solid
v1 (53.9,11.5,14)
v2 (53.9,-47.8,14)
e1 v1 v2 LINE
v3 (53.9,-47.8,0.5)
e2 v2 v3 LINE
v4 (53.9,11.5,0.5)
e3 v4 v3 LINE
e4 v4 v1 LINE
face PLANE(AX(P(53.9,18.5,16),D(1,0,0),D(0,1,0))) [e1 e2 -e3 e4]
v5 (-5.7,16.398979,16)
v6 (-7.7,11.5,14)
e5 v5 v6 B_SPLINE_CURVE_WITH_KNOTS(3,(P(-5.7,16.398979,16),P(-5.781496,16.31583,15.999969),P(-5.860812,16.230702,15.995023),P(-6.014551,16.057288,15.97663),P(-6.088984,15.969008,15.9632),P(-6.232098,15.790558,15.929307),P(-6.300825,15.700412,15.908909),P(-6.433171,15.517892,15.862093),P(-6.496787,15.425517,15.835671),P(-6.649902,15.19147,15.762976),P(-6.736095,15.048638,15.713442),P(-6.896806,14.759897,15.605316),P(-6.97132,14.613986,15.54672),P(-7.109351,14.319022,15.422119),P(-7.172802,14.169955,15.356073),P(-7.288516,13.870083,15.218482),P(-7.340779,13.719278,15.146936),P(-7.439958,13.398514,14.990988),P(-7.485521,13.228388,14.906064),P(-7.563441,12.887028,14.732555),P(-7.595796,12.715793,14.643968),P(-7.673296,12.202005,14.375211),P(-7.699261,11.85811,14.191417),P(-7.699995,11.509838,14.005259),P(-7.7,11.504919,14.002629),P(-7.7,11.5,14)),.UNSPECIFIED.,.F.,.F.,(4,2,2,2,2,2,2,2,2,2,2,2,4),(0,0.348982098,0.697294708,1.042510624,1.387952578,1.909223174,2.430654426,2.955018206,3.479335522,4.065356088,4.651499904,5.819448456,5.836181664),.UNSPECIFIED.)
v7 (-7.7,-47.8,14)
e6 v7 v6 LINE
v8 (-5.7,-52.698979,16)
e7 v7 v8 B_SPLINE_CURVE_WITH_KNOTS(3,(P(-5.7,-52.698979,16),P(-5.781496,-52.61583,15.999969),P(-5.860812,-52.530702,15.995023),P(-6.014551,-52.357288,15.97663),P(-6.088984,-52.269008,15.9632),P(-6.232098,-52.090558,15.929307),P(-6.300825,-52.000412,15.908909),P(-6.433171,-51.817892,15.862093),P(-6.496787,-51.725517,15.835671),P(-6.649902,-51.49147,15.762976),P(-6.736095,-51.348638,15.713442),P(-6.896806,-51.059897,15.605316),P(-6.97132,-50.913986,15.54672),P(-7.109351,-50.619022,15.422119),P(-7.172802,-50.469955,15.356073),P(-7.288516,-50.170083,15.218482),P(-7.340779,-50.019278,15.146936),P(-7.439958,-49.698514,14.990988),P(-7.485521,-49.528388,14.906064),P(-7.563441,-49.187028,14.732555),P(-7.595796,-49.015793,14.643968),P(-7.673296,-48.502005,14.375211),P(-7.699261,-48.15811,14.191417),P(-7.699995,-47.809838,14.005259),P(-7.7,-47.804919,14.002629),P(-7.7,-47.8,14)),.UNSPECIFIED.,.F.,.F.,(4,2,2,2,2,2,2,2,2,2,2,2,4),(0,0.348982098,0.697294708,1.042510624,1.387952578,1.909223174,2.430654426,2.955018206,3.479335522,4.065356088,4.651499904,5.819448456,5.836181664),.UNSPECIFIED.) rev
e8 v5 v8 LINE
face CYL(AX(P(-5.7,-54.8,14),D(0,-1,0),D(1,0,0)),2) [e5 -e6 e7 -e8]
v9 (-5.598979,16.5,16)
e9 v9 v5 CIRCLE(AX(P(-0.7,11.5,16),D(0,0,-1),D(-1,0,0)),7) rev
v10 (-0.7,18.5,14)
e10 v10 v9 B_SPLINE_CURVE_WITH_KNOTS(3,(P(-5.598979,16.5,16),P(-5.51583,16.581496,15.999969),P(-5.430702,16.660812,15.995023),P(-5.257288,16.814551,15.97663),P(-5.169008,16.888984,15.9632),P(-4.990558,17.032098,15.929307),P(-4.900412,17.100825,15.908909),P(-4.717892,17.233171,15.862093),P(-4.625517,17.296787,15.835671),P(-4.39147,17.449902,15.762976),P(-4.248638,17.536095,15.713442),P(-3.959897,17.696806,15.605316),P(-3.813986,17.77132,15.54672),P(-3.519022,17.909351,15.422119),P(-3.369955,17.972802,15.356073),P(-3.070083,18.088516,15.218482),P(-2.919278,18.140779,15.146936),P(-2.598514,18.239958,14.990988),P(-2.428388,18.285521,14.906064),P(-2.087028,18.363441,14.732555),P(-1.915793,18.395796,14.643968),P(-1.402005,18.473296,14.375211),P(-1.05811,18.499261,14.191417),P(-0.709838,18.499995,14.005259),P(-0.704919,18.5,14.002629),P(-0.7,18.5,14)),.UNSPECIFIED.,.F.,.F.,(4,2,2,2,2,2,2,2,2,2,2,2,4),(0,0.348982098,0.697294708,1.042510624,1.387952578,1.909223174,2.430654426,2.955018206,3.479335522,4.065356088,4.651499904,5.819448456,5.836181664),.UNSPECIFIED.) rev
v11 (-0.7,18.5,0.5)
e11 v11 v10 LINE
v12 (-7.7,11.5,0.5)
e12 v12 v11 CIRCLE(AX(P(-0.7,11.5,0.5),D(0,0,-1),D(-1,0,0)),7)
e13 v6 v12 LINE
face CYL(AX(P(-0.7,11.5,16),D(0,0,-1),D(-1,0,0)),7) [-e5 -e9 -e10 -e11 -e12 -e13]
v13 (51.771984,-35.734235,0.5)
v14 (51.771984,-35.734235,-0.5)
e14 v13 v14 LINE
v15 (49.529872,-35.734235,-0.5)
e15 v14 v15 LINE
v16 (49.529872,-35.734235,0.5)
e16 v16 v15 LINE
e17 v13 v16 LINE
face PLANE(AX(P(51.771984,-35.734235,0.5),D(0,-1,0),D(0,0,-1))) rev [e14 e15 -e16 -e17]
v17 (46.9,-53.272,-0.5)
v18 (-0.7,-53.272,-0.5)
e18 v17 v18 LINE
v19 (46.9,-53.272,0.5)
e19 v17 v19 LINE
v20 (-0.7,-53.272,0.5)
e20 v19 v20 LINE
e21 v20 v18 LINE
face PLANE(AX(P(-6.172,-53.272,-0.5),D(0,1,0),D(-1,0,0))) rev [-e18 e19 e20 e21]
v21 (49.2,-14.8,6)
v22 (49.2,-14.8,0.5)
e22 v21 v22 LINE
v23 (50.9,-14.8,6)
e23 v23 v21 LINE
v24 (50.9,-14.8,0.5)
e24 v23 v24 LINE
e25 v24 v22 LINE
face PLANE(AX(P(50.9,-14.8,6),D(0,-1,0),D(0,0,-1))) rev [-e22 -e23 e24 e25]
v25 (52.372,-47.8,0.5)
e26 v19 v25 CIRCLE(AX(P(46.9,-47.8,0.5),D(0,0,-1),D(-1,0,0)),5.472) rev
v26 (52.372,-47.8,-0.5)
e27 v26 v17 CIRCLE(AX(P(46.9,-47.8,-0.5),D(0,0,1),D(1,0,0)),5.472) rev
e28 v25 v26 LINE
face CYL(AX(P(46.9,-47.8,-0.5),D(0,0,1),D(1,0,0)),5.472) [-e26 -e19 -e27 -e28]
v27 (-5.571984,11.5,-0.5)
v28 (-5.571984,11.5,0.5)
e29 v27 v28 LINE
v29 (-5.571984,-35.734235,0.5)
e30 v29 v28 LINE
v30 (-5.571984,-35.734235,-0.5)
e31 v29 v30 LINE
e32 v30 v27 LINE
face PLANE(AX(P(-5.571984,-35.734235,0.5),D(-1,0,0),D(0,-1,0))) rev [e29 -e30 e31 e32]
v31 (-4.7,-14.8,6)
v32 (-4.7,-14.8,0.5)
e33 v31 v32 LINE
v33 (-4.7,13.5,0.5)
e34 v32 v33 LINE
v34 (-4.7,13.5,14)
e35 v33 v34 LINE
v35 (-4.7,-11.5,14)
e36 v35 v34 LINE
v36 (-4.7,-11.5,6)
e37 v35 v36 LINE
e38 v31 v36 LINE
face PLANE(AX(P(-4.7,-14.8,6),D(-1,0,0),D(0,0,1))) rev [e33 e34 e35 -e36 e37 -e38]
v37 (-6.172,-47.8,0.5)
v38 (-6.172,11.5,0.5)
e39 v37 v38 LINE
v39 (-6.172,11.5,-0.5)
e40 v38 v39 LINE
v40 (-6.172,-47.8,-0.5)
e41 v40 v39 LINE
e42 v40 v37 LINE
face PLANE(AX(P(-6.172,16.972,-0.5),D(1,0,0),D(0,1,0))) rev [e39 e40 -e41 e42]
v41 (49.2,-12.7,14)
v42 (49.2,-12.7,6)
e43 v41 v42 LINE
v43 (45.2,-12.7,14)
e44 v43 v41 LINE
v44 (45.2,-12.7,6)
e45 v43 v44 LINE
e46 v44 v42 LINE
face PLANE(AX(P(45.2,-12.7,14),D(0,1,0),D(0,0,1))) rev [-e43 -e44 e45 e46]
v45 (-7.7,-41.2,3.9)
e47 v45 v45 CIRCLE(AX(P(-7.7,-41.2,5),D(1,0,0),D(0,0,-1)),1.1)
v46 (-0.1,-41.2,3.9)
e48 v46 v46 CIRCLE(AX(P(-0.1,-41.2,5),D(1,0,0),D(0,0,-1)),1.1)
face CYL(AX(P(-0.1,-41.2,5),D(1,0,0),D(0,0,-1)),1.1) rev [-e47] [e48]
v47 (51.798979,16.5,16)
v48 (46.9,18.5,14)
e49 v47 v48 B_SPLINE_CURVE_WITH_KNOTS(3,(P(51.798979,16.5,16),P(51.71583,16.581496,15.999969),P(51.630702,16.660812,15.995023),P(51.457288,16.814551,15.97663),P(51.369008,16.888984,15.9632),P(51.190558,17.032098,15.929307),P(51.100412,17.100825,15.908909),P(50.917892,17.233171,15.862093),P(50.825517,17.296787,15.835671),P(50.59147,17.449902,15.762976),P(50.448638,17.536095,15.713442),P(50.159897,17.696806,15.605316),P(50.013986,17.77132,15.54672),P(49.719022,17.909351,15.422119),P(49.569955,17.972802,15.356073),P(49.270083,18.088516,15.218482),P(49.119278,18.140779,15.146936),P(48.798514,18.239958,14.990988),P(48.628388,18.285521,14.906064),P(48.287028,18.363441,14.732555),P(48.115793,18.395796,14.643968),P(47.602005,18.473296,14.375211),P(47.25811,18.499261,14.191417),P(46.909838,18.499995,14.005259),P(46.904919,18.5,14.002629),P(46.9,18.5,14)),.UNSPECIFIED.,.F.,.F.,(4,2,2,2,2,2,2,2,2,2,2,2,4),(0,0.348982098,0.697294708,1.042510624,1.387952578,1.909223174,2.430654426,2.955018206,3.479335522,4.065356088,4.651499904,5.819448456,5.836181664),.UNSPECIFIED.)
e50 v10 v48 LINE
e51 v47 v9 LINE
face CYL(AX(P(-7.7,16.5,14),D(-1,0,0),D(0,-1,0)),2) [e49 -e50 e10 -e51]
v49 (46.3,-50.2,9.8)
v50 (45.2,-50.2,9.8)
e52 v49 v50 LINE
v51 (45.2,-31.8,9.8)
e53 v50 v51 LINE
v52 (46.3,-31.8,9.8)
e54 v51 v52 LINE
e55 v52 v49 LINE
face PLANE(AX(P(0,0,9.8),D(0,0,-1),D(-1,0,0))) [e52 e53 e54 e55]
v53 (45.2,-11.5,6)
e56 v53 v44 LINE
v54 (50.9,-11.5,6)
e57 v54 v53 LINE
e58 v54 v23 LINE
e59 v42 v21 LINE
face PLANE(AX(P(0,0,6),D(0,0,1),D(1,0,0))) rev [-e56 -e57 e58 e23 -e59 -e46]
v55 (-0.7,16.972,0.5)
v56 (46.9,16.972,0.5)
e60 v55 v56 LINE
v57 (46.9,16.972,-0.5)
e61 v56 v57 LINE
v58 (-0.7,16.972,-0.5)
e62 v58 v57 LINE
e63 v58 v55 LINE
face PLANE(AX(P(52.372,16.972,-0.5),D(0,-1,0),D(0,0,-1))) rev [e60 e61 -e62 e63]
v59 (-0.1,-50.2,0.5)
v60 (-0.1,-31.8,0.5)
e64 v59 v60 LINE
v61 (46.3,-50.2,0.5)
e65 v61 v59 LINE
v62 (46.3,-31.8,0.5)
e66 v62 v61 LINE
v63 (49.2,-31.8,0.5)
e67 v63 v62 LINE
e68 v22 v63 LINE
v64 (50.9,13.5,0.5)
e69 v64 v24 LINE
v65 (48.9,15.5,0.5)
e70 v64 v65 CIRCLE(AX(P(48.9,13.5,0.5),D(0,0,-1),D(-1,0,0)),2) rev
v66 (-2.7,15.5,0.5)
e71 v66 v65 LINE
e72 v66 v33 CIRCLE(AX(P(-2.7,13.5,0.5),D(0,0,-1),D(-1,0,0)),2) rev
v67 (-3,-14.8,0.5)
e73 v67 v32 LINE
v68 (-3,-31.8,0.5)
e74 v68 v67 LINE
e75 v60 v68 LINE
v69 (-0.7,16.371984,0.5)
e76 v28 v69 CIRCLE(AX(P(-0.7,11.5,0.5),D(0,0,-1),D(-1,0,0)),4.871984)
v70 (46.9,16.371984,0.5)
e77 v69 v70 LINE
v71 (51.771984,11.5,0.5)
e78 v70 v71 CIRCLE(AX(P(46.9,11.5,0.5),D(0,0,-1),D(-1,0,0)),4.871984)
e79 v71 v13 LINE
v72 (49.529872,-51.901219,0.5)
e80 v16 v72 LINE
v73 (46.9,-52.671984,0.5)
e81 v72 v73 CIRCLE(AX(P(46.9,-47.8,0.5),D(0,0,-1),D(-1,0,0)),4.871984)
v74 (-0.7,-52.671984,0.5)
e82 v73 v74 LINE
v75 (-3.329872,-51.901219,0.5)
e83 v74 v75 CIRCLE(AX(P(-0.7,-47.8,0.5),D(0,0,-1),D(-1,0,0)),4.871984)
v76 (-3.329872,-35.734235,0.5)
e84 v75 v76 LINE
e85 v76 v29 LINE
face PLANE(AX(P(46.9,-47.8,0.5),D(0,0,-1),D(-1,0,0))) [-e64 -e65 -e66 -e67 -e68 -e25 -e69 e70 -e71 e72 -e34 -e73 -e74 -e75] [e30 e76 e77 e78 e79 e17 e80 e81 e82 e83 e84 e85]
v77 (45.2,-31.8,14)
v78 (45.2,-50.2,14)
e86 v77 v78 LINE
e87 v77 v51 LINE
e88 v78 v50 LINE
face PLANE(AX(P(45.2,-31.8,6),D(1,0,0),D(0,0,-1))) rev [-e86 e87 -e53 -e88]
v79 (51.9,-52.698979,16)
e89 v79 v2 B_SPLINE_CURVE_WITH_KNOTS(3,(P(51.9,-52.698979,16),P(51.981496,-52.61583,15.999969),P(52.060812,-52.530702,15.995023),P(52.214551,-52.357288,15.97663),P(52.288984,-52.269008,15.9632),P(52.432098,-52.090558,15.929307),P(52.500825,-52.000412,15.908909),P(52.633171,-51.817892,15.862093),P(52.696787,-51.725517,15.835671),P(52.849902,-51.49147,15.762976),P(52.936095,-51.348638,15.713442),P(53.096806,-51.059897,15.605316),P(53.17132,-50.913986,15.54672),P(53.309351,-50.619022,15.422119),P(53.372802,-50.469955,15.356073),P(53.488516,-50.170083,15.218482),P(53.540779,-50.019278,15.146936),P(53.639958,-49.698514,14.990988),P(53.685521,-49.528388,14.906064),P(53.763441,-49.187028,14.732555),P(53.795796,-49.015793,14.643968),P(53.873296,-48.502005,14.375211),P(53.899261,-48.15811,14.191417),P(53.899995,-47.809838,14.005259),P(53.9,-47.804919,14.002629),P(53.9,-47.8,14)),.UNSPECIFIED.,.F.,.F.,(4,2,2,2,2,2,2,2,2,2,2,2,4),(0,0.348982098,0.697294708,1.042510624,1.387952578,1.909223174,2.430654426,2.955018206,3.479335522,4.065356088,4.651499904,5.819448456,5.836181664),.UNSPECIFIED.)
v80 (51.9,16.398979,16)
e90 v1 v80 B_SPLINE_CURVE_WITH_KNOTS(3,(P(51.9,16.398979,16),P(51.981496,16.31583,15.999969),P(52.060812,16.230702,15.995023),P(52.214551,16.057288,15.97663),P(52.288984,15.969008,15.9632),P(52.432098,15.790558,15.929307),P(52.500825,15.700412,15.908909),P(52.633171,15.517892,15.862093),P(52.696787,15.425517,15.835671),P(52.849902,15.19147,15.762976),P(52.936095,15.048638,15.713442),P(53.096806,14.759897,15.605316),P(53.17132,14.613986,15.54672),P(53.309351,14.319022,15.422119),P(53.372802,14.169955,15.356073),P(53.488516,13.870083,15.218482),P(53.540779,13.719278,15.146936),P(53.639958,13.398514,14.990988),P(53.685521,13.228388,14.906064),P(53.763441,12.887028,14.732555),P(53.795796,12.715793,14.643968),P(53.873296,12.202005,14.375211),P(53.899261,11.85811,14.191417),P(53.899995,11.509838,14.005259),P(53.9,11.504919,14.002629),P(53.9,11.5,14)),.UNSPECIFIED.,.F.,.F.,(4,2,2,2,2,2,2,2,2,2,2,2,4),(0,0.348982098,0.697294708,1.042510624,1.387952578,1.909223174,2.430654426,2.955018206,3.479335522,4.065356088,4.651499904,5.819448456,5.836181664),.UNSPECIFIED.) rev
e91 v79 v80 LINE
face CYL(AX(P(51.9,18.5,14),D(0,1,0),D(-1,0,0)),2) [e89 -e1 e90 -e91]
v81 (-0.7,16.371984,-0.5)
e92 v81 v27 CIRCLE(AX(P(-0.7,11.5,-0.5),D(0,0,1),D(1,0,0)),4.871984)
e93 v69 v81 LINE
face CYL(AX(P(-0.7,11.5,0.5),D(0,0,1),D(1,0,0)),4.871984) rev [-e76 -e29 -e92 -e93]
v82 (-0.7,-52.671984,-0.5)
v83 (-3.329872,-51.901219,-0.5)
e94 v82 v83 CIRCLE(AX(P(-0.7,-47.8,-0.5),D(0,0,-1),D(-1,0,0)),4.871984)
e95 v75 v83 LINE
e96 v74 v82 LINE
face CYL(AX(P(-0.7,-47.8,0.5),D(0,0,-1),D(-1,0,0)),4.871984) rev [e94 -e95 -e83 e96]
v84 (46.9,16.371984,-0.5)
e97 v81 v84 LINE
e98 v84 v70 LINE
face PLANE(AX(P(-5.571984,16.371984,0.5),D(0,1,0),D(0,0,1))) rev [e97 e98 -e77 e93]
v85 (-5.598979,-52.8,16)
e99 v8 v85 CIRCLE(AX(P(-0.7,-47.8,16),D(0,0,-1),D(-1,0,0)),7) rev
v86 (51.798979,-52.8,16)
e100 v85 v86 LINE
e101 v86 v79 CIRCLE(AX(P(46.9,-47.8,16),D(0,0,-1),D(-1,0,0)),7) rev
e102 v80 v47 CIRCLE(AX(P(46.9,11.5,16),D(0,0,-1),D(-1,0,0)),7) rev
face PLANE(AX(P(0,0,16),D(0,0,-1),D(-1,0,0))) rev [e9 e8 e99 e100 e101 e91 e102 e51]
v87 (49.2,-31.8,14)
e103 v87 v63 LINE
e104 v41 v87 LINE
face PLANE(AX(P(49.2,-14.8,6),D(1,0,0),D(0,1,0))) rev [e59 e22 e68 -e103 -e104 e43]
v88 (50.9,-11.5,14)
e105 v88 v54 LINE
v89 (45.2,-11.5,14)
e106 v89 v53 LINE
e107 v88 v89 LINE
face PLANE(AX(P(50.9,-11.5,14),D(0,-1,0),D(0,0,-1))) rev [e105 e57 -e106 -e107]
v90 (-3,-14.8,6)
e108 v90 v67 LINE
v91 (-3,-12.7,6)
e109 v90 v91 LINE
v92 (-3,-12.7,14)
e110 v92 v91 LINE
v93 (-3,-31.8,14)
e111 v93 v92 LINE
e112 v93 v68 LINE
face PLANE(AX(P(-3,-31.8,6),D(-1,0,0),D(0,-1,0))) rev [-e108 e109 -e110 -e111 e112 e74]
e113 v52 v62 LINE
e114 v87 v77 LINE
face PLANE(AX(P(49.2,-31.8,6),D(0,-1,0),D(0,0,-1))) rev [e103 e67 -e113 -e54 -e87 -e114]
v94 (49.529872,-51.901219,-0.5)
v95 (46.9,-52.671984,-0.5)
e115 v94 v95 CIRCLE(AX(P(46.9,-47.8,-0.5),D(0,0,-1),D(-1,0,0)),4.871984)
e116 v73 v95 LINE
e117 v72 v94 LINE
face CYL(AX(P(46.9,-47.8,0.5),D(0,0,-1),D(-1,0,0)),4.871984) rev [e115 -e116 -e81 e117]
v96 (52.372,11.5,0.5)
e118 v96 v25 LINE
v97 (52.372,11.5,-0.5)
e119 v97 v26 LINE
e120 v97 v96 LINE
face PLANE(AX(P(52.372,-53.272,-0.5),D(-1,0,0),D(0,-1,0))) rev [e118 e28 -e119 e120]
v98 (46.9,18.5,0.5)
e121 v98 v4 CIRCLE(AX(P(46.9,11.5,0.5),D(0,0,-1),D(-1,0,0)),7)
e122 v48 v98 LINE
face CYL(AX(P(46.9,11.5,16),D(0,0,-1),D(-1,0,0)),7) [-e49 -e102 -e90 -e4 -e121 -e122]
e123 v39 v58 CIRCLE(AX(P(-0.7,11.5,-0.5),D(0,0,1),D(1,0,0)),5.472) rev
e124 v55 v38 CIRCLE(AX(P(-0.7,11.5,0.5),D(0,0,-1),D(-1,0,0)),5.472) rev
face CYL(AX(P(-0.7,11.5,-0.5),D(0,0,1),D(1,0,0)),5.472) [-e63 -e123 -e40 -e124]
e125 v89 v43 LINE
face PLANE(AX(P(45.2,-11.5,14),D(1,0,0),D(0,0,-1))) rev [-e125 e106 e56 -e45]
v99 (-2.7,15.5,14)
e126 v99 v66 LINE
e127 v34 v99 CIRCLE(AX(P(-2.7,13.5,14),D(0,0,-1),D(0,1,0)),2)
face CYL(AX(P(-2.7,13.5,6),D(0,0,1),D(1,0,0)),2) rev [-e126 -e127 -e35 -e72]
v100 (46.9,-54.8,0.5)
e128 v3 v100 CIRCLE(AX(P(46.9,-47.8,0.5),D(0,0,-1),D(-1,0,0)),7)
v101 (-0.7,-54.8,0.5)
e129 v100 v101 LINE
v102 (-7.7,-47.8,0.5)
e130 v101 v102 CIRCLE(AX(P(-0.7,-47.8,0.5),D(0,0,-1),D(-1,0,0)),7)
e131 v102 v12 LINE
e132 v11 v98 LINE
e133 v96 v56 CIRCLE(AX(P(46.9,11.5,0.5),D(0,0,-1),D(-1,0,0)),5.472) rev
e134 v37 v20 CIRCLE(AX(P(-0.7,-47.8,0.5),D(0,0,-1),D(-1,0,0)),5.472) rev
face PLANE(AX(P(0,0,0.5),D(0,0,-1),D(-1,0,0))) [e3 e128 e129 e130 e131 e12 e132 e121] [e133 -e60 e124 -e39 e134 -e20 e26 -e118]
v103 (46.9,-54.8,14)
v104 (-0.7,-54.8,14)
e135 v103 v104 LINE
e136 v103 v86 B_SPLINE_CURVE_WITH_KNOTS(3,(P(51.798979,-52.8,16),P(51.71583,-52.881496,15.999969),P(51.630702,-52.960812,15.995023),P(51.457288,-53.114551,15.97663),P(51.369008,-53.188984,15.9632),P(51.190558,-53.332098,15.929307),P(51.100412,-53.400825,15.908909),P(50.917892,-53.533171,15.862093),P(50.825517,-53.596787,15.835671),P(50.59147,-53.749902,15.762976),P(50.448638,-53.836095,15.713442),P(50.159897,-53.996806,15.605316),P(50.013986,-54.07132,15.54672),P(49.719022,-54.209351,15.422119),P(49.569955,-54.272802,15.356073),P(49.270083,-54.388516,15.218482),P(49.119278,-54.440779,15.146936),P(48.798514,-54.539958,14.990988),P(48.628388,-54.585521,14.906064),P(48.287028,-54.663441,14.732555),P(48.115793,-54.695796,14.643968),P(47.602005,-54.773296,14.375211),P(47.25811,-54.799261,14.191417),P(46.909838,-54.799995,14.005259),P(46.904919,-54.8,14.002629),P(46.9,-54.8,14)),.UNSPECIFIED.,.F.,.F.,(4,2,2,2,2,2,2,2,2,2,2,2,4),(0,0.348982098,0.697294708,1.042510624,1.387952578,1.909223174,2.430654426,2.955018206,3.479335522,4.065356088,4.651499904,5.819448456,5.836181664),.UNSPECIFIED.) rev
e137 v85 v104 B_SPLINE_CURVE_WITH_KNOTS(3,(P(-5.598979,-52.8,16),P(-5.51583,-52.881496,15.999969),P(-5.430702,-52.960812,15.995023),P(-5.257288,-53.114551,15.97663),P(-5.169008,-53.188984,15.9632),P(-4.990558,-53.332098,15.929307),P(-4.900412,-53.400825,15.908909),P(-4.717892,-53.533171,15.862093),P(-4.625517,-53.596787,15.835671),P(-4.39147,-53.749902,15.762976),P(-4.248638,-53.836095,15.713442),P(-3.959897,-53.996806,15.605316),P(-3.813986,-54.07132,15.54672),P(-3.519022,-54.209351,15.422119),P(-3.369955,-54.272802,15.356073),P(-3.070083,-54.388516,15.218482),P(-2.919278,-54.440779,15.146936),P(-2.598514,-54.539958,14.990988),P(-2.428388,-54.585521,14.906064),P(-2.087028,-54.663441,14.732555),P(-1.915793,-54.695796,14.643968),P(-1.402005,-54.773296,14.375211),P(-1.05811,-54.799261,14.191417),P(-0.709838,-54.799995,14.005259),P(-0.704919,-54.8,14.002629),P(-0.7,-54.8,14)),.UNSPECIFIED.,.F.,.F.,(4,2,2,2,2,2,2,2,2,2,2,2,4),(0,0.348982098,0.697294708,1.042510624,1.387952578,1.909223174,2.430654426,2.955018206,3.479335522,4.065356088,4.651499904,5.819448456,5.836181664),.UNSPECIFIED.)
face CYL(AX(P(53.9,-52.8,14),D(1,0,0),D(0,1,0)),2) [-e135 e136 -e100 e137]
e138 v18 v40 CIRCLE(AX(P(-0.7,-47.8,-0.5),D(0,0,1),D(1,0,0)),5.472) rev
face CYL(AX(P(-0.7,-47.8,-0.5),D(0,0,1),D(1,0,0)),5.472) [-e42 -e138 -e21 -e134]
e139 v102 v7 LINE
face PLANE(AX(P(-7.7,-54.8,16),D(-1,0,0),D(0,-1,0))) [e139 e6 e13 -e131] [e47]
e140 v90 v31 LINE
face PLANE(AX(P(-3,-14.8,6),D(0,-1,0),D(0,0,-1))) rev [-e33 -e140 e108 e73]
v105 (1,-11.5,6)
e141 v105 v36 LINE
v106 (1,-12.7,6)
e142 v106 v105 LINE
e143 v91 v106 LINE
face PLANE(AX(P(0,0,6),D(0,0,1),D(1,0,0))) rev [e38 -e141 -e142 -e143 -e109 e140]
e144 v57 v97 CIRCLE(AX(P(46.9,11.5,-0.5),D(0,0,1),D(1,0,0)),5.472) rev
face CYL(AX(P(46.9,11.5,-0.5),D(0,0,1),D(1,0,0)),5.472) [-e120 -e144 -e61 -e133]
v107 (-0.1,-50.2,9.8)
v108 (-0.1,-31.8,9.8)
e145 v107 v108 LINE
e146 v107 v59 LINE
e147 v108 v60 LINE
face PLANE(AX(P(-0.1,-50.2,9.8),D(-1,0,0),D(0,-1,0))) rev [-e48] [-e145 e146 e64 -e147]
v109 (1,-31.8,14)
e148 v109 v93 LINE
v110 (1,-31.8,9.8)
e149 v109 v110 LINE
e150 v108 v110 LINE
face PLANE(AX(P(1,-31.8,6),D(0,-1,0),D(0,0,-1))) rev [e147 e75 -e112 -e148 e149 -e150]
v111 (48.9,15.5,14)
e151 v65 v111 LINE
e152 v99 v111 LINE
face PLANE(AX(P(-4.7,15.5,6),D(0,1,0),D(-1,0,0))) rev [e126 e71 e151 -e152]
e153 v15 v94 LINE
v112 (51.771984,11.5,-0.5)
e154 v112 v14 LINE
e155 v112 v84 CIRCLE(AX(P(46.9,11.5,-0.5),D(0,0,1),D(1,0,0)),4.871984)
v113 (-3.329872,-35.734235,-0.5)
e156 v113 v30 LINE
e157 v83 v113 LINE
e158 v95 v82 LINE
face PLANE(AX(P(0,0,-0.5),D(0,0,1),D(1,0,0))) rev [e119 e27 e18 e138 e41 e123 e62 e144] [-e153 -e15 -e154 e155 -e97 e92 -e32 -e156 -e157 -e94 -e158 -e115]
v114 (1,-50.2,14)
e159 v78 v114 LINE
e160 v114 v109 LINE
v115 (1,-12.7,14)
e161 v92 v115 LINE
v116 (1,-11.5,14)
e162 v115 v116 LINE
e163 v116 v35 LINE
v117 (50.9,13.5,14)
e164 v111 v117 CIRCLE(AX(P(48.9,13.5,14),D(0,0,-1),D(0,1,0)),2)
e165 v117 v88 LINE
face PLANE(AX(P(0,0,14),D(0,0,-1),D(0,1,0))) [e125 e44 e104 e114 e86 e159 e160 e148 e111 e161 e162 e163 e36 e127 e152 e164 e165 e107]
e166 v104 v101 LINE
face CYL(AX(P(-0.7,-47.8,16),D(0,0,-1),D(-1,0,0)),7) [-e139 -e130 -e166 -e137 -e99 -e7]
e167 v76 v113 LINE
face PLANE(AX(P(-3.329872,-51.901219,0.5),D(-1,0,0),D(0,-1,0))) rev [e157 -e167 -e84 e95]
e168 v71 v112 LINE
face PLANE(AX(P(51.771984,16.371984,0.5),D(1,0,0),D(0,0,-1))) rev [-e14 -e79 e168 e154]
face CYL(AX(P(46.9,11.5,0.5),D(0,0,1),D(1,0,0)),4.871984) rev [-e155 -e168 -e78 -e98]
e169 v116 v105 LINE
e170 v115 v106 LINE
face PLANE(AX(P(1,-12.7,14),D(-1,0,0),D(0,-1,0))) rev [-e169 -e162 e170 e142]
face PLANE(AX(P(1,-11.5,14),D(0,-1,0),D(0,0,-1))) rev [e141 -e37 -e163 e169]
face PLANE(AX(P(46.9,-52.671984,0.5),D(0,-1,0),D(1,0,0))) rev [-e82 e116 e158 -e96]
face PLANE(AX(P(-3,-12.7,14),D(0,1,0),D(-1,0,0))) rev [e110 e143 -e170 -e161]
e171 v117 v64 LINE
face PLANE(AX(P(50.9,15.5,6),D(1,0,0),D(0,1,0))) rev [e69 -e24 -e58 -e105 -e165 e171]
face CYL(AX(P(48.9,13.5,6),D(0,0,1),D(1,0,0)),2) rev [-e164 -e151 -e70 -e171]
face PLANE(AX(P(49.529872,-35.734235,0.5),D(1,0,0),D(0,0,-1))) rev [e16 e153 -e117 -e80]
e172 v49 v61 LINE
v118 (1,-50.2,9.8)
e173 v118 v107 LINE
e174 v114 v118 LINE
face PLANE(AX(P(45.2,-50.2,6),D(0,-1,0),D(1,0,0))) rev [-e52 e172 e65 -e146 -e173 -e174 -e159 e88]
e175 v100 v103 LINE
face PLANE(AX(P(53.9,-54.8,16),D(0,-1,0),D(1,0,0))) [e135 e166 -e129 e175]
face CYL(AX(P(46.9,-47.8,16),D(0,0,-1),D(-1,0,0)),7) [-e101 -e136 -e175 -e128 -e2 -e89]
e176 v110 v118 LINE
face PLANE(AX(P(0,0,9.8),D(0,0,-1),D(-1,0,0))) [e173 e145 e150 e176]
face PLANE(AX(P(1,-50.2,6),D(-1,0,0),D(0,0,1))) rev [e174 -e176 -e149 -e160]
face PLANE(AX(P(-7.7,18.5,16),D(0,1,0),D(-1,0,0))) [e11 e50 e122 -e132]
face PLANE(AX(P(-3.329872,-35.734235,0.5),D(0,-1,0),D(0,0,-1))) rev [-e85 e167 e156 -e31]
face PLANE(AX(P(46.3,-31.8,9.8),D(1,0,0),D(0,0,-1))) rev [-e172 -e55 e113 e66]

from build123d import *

# Parameters (mm, degrees)
SKETCH1_W                      = 61.6
SKETCH1_H                      = 73.3
BOSS_EXTRUDE1_DEPTH            = 15.5
SKETCH2_W                      = 58.544
SKETCH2_H                      = 70.244
BOSS_EXTRUDE2_DEPTH            = 1
CUT_EXTRUDE1_DEPTH             = 1
CUT_EXTRUDE2_DEPTH             = 5.5
CUT_EXTRUDE3_DEPTH             = 8
SKETCH6_W                      = 1.1
SKETCH6_H                      = 18.4
CUT_EXTRUDE4_DEPTH             = 9.3
SKETCH7_W                      = 1.1
SKETCH7_H                      = 18.4
CUT_EXTRUDE5_DEPTH             = 9.3
F_2_2_2_2_DIAMETER_HOLE1_D     = 2.2
F_2_2_2_2_DIAMETER_HOLE1_DEPTH = 7.6
FILLET1_R                      = 2
FILLET2_R                      = 4.871984114
FILLET3_R                      = 5.472
FILLET4_R                      = 7


with BuildPart() as part:
    # Sketch1 → Boss-Extrude1 (new body)
    with BuildSketch(Plane(origin=(0, 0, 0.5), x_dir=(-1, 0, 0), z_dir=(0, 0, -1))):
        with Locations((-23.1, -18.15)):
            Rectangle(SKETCH1_W, SKETCH1_H)
    extrude(amount=-BOSS_EXTRUDE1_DEPTH)

    # Sketch2 → Boss-Extrude2 (add)
    with BuildSketch(Plane(origin=(0, 0, 0.5), x_dir=(-1, 0, 0), z_dir=(0, 0, -1))):
        with Locations((-23.1, -18.15)):
            Rectangle(SKETCH2_W, SKETCH2_H)
    extrude(amount=BOSS_EXTRUDE2_DEPTH)

    # Sketch3 → Cut-Extrude1 (cut)
    with BuildSketch(Plane(origin=(0, 0, -0.5), x_dir=(-1, 0, 0), z_dir=(0, 0, -1))):
        with BuildLine():
            Line((-51.771984114, 16.371984114), (-51.771984114, -35.734235116))
            Line((-51.771984114, -35.734235116), (-49.52987247, -35.734235116))
            Line((-49.52987247, -35.734235116), (-49.52987247, -51.901219331))
            ThreePointArc((-49.52987247, -51.901219331), (-48.270247018, -52.475323766), (-46.9, -52.671984114))
            Line((-46.9, -52.671984114), (0.7, -52.671984114))
            ThreePointArc((0.7, -52.671984114), (2.070247018, -52.475323766), (3.32987247, -51.901219331))
            Line((3.32987247, -51.901219331), (3.32987247, -35.734235116))
            Line((3.32987247, -35.734235116), (5.571984114, -35.734235116))
            Line((5.571984114, -35.734235116), (5.571984114, 16.371984114))
            Line((5.571984114, 16.371984114), (-51.771984114, 16.371984114))
        make_face()
    extrude(amount=-CUT_EXTRUDE1_DEPTH, mode=Mode.SUBTRACT)

    # Sketch4 → Cut-Extrude2 (cut)
    with BuildSketch(Plane(origin=(0, 0, 0.5), x_dir=(-1, 0, 0), z_dir=(0, 0, -1))):
        Polygon((3, -14.8), (4.7, -14.8), (4.7, 15.5), (-50.9, 15.5), (-50.9, -14.8), (-49.2, -14.8), (-49.2, -31.8), (-45.2, -31.8), (-45.2, -50.2), (-1, -50.2), (-1, -31.8), (3, -31.8), align=None)
    extrude(amount=-CUT_EXTRUDE2_DEPTH, mode=Mode.SUBTRACT)

    # Sketch5 → Cut-Extrude3 (cut)
    with BuildSketch(Plane(origin=(0, 0, 6), x_dir=(-1, 0, 0), z_dir=(0, 0, -1))):
        Polygon((3, -12.7), (-1, -12.7), (-1, -11.5), (4.7, -11.5), (4.7, 15.5), (-50.9, 15.5), (-50.9, -11.5), (-45.2, -11.5), (-45.2, -12.7), (-49.2, -12.7), (-49.2, -31.8), (-45.2, -31.8), (-45.2, -50.2), (-1, -50.2), (-1, -31.8), (3, -31.8), align=None)
    extrude(amount=-CUT_EXTRUDE3_DEPTH, mode=Mode.SUBTRACT)

    # Sketch6 → Cut-Extrude4 (cut)
    with BuildSketch(Plane(origin=(0, 0, 0.5), x_dir=(-1, 0, 0), z_dir=(0, 0, -1))):
        with Locations((-45.75, -41)):
            Rectangle(SKETCH6_W, SKETCH6_H)
    extrude(amount=-CUT_EXTRUDE4_DEPTH, mode=Mode.SUBTRACT)

    # Sketch7 → Cut-Extrude5 (cut)
    with BuildSketch(Plane(origin=(0, 0, 0.5), x_dir=(-1, 0, 0), z_dir=(0, 0, -1))):
        with Locations((-0.45, -41)):
            Rectangle(SKETCH7_W, SKETCH7_H)
    extrude(amount=-CUT_EXTRUDE5_DEPTH, mode=Mode.SUBTRACT)

    # Ø2.2 (2.2) Diameter Hole1
    with Locations(Plane(origin=(-0.1, 0, 0), x_dir=(0, 0, -1), z_dir=(1, 0, 0))):
        with Locations((-5, -41.2)):
            Hole(F_2_2_2_2_DIAMETER_HOLE1_D / 2, depth=F_2_2_2_2_DIAMETER_HOLE1_DEPTH)

    # Fillet1
    fillet1_edges = [part.edges().sort_by_distance(p)[0] for p in [
        (23.1, -54.8, 16),
        (-7.7, -18.15, 16),
        (23.1, 18.5, 16),
        (50.9, 15.5, 7.25),
        (-4.7, 15.5, 7.25),
        (53.9, -18.15, 16),
    ]]
    fillet(fillet1_edges, radius=FILLET1_R)

    # Fillet2
    fillet2_edges = [part.edges().sort_by_distance(p)[0] for p in [
        (51.771984114, 16.371984114, 0),
        (-5.571984114, 16.371984114, 0),
    ]]
    fillet(fillet2_edges, radius=FILLET2_R)

    # Fillet3
    fillet3_edges = [part.edges().sort_by_distance(p)[0] for p in [
        (52.372, 16.972, 0),
        (52.372, -53.272, 0),
        (-6.172, -53.272, 0),
        (-6.172, 16.972, 0),
    ]]
    fillet(fillet3_edges, radius=FILLET3_R)

    # Fillet4
    # the kernel refuses this fillet: 7 mm, written as the material it takes off along each edge
    with BuildSketch(Plane(origin=(-7.7, -54.8, -17), x_dir=(1, 0, 0), z_dir=(0, 0, 1)), Plane(origin=(53.9, -54.8, -17), x_dir=(0, 1, 0), z_dir=(0, 0, 1))) as fillet4_piece_1:
        with BuildLine():
            CenterArc((FILLET4_R, FILLET4_R), FILLET4_R, 180, 90)
            Line((0, FILLET4_R), (0, 0))
            Line((0, 0), (FILLET4_R, 0))
        make_face()
    extrude(amount=48.5, mode=Mode.SUBTRACT)
    with BuildSketch(Plane(origin=(-7.7, 18.5, -17), x_dir=(1, 0, 0), z_dir=(0, 0, 1)), Plane(origin=(53.9, 18.5, -17), x_dir=(0, -1, 0), z_dir=(0, 0, 1))) as fillet4_piece_2:
        with BuildLine():
            CenterArc((FILLET4_R, -FILLET4_R), FILLET4_R, 90, 90)
            Line((0, -FILLET4_R), (0, 0))
            Line((0, 0), (FILLET4_R, 0))
        make_face()
    extrude(amount=48.5, mode=Mode.SUBTRACT)


solid = part.part
